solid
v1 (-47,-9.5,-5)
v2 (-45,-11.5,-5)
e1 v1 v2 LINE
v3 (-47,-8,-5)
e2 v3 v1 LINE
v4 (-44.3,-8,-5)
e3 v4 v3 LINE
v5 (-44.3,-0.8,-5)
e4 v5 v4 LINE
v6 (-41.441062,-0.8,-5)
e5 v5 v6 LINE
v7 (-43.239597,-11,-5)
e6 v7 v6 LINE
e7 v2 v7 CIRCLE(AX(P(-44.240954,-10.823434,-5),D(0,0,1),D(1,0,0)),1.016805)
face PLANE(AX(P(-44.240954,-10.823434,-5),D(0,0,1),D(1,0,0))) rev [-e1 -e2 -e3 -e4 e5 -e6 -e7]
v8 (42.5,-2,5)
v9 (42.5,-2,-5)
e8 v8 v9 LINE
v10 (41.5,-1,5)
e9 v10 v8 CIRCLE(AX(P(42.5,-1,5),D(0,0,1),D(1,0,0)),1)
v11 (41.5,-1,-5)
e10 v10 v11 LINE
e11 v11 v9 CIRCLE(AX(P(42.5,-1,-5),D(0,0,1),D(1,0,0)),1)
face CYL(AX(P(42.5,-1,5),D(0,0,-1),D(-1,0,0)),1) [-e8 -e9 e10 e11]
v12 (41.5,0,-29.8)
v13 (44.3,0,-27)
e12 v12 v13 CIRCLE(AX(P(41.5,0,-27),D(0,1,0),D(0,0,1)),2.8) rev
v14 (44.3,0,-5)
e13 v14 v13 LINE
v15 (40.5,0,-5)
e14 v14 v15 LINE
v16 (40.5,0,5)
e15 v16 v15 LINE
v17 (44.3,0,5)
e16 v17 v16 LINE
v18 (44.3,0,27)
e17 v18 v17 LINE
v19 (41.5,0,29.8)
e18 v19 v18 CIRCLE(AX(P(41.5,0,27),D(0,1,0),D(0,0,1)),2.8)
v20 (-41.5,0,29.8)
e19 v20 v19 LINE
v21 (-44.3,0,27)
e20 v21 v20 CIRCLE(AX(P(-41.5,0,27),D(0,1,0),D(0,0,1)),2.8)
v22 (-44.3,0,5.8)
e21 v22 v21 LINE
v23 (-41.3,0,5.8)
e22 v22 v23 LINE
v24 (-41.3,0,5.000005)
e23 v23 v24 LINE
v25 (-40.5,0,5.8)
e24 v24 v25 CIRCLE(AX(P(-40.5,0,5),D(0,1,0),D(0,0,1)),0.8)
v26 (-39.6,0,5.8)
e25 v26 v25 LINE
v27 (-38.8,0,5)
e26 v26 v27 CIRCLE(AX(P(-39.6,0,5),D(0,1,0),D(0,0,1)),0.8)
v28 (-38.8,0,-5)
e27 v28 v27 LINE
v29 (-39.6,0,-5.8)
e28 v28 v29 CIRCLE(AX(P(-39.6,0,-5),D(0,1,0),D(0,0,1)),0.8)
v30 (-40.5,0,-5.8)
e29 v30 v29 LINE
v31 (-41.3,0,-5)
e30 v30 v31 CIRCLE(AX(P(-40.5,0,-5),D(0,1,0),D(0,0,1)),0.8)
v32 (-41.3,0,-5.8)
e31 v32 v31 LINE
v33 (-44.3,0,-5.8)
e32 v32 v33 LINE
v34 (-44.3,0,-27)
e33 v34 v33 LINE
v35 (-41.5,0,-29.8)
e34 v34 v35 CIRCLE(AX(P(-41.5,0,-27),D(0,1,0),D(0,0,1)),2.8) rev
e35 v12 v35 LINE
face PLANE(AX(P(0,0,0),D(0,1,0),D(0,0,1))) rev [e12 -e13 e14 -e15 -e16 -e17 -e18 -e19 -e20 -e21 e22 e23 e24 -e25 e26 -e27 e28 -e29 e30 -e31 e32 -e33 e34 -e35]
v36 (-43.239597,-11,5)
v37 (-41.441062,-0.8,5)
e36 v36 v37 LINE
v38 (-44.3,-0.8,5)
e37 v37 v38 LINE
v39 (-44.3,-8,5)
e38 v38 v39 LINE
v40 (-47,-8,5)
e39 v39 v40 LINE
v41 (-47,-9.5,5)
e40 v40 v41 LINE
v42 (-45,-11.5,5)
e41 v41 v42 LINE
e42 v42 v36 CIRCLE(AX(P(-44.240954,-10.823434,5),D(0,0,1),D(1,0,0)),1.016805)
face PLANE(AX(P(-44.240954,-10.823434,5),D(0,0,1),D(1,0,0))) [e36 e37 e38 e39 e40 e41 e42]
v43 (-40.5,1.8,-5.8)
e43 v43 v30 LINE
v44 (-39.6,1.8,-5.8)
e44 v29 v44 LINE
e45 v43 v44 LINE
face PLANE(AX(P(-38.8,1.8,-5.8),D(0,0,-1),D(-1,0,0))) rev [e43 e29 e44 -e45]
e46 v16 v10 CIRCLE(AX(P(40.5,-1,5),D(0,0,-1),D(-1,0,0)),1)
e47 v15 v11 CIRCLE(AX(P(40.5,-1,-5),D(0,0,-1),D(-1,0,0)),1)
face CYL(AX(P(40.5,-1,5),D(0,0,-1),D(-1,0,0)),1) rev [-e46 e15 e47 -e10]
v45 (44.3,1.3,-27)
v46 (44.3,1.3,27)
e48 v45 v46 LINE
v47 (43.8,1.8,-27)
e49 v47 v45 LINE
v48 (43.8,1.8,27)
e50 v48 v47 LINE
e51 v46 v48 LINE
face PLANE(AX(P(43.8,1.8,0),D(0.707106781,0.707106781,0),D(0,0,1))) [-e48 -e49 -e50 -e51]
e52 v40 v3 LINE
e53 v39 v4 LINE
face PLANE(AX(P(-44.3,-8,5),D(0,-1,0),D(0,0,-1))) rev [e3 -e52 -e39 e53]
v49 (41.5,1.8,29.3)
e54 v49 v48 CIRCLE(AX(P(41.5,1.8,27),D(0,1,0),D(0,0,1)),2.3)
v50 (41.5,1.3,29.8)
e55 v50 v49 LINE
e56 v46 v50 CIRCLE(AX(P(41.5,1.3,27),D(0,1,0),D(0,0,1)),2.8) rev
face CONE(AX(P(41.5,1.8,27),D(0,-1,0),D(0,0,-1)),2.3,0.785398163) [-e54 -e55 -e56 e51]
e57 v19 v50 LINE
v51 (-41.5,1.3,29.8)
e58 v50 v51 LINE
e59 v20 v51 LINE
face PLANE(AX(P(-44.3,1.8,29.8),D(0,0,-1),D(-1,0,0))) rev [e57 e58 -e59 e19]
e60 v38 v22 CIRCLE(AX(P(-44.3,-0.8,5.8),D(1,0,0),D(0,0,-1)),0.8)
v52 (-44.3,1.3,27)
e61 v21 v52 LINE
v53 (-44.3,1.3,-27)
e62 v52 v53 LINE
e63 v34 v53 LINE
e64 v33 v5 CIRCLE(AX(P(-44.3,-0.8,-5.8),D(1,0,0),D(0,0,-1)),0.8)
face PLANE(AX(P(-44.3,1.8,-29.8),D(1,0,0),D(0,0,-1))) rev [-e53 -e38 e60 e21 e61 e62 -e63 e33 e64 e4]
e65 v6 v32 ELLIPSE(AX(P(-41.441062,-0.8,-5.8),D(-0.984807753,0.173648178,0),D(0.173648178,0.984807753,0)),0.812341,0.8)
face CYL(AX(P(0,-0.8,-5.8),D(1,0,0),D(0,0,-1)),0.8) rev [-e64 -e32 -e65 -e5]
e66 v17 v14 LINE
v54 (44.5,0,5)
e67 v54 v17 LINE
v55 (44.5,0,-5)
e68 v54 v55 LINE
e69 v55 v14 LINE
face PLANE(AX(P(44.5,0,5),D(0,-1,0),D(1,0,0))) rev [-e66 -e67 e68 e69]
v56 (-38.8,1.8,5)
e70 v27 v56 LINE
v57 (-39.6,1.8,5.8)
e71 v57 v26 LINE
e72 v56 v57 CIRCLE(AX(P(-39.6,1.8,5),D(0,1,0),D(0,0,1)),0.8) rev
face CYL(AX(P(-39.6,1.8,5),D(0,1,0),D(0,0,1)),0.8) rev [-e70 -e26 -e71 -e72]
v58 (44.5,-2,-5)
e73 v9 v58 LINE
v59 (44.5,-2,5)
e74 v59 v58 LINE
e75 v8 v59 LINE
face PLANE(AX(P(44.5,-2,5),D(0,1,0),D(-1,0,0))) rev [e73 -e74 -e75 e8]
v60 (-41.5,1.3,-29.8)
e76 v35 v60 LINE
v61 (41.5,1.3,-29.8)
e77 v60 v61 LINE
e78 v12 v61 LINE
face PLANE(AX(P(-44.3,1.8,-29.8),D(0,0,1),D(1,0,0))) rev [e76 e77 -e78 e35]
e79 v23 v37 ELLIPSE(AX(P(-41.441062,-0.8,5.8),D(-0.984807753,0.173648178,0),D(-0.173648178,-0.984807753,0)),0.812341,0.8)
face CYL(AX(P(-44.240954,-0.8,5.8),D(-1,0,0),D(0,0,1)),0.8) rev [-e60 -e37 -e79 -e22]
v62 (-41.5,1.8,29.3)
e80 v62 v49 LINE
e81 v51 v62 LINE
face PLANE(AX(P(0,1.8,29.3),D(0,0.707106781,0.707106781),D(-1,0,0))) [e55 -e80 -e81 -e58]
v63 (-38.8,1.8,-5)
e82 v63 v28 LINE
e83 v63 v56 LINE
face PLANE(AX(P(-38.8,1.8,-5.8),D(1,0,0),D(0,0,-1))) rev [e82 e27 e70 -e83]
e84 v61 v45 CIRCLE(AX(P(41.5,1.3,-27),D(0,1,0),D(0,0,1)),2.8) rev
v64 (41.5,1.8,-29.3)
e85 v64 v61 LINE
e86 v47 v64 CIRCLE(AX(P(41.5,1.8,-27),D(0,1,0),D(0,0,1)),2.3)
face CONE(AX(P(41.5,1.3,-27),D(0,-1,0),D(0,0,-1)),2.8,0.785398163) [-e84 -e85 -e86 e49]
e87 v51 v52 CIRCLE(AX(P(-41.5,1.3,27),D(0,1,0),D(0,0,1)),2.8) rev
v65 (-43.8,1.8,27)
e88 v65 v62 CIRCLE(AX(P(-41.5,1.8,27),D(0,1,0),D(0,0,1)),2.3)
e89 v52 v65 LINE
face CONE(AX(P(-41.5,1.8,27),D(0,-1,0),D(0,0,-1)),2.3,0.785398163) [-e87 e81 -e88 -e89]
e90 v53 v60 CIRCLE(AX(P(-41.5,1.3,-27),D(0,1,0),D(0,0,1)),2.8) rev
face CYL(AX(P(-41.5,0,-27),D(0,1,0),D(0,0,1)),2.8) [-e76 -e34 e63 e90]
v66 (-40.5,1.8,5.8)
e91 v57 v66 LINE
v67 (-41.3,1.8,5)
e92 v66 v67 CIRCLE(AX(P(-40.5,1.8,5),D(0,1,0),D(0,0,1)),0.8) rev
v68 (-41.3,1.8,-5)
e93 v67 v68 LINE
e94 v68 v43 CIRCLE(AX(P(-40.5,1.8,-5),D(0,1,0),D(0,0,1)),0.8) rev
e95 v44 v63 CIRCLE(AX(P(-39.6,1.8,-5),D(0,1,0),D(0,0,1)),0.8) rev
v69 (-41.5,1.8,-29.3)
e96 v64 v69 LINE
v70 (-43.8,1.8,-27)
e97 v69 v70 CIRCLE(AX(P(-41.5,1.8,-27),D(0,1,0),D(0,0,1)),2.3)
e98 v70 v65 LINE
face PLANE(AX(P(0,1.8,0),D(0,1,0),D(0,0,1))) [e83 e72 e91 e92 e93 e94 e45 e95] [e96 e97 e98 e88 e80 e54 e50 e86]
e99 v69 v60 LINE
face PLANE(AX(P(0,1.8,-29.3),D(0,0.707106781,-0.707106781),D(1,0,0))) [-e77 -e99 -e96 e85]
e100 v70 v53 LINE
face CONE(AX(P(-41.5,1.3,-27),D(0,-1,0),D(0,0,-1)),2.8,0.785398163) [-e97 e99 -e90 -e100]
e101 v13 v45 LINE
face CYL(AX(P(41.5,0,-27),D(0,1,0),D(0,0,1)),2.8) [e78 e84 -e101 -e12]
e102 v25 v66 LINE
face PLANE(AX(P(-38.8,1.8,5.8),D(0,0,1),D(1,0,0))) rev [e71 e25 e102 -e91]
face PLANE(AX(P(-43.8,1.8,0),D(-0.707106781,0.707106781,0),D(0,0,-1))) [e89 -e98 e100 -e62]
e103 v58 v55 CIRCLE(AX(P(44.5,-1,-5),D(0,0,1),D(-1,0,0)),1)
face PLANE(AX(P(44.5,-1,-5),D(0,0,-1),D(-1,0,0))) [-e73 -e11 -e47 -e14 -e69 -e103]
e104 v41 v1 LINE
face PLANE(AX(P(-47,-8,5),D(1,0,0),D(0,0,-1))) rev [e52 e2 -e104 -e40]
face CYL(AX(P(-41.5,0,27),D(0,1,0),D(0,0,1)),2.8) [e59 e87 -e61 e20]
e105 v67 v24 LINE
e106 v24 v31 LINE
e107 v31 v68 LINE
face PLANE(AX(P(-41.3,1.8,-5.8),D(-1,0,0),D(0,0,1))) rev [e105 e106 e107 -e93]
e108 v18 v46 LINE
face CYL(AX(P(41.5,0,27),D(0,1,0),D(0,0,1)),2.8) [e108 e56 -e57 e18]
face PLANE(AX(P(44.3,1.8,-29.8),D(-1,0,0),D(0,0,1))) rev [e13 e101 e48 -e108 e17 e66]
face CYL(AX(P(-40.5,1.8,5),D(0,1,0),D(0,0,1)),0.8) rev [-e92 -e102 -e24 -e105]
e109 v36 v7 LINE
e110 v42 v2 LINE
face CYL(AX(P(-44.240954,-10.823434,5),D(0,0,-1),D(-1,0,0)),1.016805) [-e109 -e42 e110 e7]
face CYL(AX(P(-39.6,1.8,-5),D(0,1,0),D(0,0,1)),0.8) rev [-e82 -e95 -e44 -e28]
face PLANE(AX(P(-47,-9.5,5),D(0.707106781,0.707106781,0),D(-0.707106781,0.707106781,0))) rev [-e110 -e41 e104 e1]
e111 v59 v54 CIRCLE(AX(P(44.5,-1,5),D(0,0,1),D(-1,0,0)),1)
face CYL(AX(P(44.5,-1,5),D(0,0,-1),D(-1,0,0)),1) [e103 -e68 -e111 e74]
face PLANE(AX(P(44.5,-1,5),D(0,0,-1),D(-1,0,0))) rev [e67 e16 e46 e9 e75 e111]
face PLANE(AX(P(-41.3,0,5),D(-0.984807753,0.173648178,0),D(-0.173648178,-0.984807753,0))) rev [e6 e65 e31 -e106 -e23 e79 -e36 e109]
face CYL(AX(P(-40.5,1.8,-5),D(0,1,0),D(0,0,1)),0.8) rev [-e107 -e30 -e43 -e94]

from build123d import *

# Parameters (mm, degrees)
SKIZZE1_W                       = 88.6
SKIZZE1_H                       = 59.6
AUFSATZ_LINEAR_AUSTRAGEN1_DEPTH = 1.8
SCHNITT_LINEAR_AUSTRAGEN1_DEPTH = 54.420688876
FASE1_SIZE                      = 0.5
AUFSATZ_LINEAR_AUSTRAGEN2_DEPTH = 5
AUFSATZ_LINEAR_AUSTRAGEN3_DEPTH = 5
VERRUNDUNG1_R                   = 0.8
SKIZZE5_W                       = 2.5
SKIZZE5_H                       = 11.6
SCHNITT_LINEAR_AUSTRAGEN2_DEPTH = 57.896671713
VERRUNDUNG2_R                   = 0.8


with BuildPart() as part:
    # Skizze1 → Aufsatz-Linear austragen1 (new body)
    with BuildSketch(Plane(origin=(0, 0, 0), x_dir=(1, 0, 0), z_dir=(0, 1, 0))):
        Rectangle(SKIZZE1_W, SKIZZE1_H)
    extrude(amount=AUFSATZ_LINEAR_AUSTRAGEN1_DEPTH)

    # Skizze2 → Schnitt-Linear austragen1 (cut, through all)
    with BuildSketch(Plane(origin=(0, 1.8, 0), x_dir=(1, 0, 0), z_dir=(0, 1, 0))):
        with BuildLine():
            Line((-44.3, -29.8), (-41.5, -29.8))
            ThreePointArc((-41.5, -29.8), (-43.479898987, -28.979898987), (-44.3, -27))
            Line((-44.3, -27), (-44.3, -29.8))
        make_face()
        with BuildLine():
            Line((41.5, -29.8), (44.3, -29.8))
            Line((44.3, -29.8), (44.3, -27))
            ThreePointArc((44.3, -27), (43.479898987, -28.979898987), (41.5, -29.8))
        make_face()
        with BuildLine():
            ThreePointArc((41.5, 29.8), (43.479898987, 28.979898987), (44.3, 27))
            Line((44.3, 27), (44.3, 29.8))
            Line((44.3, 29.8), (41.5, 29.8))
        make_face()
        with BuildLine():
            ThreePointArc((-44.3, 27), (-43.479898987, 28.979898987), (-41.5, 29.8))
            Line((-41.5, 29.8), (-44.3, 29.8))
            Line((-44.3, 29.8), (-44.3, 27))
        make_face()
    extrude(amount=-SCHNITT_LINEAR_AUSTRAGEN1_DEPTH, mode=Mode.SUBTRACT)

    # Fase1
    fase1_edges = [part.edges().sort_by_distance(p)[0] for p in [
        (44.3, 1.8, 0),
        (0, 1.8, -29.8),
        (-44.3, 1.8, 0),
        (0, 1.8, 29.8),
        (-43.479898987, 1.8, -28.979898987),
        (43.479898987, 1.8, -28.979898987),
        (43.479898987, 1.8, 28.979898987),
        (-43.479898987, 1.8, 28.979898987),
    ]]
    chamfer(fase1_edges, length=FASE1_SIZE)

    # Skizze3 → Aufsatz-Linear austragen2 (add, symmetric)
    with BuildSketch(Plane.XY):
        with BuildLine():
            Line((44.5, 0), (40.5, 0))
            ThreePointArc((40.5, 0), (41.207106781, -0.292893219), (41.5, -1))
            ThreePointArc((41.5, -1), (41.792893219, -1.707106781), (42.5, -2))
            Line((42.5, -2), (44.5, -2))
            ThreePointArc((44.5, -2), (45.5, -1), (44.5, 0))
        make_face()
    extrude(amount=AUFSATZ_LINEAR_AUSTRAGEN2_DEPTH, both=True)

    # Skizze4 → Aufsatz-Linear austragen3 (add, symmetric)
    with BuildSketch(Plane.XY):
        with BuildLine():
            Line((-44.3, 0), (-44.3, -8))
            Line((-44.3, -8), (-47, -8))
            Line((-47, -8), (-47, -9.5))
            Line((-47, -9.5), (-45, -11.5))
            ThreePointArc((-45, -11.5), (-43.963143632, -11.801551092), (-43.239596788, -11))
            Line((-43.239596788, -11), (-41.3, 0))
            Line((-41.3, 0), (-44.3, 0))
        make_face()
    extrude(amount=AUFSATZ_LINEAR_AUSTRAGEN3_DEPTH, both=True)

    # Verrundung1
    verrundung1_edges = [part.edges().sort_by_distance(p)[0] for p in [
        (-42.8, 0, -5),
        (-42.8, 0, 5),
    ]]
    fillet(verrundung1_edges, radius=VERRUNDUNG1_R)

    # Skizze5 → Schnitt-Linear austragen2 (cut, through all)
    with BuildSketch(Plane.XZ):
        with Locations((-40.05, 0)):
            Rectangle(SKIZZE5_W, SKIZZE5_H)
    extrude(amount=-SCHNITT_LINEAR_AUSTRAGEN2_DEPTH, mode=Mode.SUBTRACT)

    # Verrundung2
    # the kernel refuses this fillet: 0.8 mm, written as the material it adds along each edge
    with BuildSketch(Plane(origin=(-41.3, 0, -5.8), x_dir=(1, 0, 0), z_dir=(0, 1, 0))) as verrundung2_piece_1:
        with BuildLine():
            CenterArc((VERRUNDUNG2_R, -VERRUNDUNG2_R), VERRUNDUNG2_R, 90, 90)
            Line((0, -VERRUNDUNG2_R), (0, 0))
            Line((0, 0), (VERRUNDUNG2_R, 0))
        make_face()
    extrude(amount=1.8)
    with BuildSketch(Plane(origin=(-41.3, 0, 5.8), x_dir=(1, 0, 0), z_dir=(0, 1, 0)), Plane(origin=(-38.8, 0, 5.8), x_dir=(0, 0, -1), z_dir=(0, 1, 0)), Plane(origin=(-38.8, 0, -5.8), x_dir=(-1, 0, 0), z_dir=(0, 1, 0))) as verrundung2_piece_2:
        with BuildLine():
            CenterArc((VERRUNDUNG2_R, VERRUNDUNG2_R), VERRUNDUNG2_R, 180, 90)
            Line((0, VERRUNDUNG2_R), (0, 0))
            Line((0, 0), (VERRUNDUNG2_R, 0))
        make_face()
    extrude(amount=1.8)


solid = part.part
